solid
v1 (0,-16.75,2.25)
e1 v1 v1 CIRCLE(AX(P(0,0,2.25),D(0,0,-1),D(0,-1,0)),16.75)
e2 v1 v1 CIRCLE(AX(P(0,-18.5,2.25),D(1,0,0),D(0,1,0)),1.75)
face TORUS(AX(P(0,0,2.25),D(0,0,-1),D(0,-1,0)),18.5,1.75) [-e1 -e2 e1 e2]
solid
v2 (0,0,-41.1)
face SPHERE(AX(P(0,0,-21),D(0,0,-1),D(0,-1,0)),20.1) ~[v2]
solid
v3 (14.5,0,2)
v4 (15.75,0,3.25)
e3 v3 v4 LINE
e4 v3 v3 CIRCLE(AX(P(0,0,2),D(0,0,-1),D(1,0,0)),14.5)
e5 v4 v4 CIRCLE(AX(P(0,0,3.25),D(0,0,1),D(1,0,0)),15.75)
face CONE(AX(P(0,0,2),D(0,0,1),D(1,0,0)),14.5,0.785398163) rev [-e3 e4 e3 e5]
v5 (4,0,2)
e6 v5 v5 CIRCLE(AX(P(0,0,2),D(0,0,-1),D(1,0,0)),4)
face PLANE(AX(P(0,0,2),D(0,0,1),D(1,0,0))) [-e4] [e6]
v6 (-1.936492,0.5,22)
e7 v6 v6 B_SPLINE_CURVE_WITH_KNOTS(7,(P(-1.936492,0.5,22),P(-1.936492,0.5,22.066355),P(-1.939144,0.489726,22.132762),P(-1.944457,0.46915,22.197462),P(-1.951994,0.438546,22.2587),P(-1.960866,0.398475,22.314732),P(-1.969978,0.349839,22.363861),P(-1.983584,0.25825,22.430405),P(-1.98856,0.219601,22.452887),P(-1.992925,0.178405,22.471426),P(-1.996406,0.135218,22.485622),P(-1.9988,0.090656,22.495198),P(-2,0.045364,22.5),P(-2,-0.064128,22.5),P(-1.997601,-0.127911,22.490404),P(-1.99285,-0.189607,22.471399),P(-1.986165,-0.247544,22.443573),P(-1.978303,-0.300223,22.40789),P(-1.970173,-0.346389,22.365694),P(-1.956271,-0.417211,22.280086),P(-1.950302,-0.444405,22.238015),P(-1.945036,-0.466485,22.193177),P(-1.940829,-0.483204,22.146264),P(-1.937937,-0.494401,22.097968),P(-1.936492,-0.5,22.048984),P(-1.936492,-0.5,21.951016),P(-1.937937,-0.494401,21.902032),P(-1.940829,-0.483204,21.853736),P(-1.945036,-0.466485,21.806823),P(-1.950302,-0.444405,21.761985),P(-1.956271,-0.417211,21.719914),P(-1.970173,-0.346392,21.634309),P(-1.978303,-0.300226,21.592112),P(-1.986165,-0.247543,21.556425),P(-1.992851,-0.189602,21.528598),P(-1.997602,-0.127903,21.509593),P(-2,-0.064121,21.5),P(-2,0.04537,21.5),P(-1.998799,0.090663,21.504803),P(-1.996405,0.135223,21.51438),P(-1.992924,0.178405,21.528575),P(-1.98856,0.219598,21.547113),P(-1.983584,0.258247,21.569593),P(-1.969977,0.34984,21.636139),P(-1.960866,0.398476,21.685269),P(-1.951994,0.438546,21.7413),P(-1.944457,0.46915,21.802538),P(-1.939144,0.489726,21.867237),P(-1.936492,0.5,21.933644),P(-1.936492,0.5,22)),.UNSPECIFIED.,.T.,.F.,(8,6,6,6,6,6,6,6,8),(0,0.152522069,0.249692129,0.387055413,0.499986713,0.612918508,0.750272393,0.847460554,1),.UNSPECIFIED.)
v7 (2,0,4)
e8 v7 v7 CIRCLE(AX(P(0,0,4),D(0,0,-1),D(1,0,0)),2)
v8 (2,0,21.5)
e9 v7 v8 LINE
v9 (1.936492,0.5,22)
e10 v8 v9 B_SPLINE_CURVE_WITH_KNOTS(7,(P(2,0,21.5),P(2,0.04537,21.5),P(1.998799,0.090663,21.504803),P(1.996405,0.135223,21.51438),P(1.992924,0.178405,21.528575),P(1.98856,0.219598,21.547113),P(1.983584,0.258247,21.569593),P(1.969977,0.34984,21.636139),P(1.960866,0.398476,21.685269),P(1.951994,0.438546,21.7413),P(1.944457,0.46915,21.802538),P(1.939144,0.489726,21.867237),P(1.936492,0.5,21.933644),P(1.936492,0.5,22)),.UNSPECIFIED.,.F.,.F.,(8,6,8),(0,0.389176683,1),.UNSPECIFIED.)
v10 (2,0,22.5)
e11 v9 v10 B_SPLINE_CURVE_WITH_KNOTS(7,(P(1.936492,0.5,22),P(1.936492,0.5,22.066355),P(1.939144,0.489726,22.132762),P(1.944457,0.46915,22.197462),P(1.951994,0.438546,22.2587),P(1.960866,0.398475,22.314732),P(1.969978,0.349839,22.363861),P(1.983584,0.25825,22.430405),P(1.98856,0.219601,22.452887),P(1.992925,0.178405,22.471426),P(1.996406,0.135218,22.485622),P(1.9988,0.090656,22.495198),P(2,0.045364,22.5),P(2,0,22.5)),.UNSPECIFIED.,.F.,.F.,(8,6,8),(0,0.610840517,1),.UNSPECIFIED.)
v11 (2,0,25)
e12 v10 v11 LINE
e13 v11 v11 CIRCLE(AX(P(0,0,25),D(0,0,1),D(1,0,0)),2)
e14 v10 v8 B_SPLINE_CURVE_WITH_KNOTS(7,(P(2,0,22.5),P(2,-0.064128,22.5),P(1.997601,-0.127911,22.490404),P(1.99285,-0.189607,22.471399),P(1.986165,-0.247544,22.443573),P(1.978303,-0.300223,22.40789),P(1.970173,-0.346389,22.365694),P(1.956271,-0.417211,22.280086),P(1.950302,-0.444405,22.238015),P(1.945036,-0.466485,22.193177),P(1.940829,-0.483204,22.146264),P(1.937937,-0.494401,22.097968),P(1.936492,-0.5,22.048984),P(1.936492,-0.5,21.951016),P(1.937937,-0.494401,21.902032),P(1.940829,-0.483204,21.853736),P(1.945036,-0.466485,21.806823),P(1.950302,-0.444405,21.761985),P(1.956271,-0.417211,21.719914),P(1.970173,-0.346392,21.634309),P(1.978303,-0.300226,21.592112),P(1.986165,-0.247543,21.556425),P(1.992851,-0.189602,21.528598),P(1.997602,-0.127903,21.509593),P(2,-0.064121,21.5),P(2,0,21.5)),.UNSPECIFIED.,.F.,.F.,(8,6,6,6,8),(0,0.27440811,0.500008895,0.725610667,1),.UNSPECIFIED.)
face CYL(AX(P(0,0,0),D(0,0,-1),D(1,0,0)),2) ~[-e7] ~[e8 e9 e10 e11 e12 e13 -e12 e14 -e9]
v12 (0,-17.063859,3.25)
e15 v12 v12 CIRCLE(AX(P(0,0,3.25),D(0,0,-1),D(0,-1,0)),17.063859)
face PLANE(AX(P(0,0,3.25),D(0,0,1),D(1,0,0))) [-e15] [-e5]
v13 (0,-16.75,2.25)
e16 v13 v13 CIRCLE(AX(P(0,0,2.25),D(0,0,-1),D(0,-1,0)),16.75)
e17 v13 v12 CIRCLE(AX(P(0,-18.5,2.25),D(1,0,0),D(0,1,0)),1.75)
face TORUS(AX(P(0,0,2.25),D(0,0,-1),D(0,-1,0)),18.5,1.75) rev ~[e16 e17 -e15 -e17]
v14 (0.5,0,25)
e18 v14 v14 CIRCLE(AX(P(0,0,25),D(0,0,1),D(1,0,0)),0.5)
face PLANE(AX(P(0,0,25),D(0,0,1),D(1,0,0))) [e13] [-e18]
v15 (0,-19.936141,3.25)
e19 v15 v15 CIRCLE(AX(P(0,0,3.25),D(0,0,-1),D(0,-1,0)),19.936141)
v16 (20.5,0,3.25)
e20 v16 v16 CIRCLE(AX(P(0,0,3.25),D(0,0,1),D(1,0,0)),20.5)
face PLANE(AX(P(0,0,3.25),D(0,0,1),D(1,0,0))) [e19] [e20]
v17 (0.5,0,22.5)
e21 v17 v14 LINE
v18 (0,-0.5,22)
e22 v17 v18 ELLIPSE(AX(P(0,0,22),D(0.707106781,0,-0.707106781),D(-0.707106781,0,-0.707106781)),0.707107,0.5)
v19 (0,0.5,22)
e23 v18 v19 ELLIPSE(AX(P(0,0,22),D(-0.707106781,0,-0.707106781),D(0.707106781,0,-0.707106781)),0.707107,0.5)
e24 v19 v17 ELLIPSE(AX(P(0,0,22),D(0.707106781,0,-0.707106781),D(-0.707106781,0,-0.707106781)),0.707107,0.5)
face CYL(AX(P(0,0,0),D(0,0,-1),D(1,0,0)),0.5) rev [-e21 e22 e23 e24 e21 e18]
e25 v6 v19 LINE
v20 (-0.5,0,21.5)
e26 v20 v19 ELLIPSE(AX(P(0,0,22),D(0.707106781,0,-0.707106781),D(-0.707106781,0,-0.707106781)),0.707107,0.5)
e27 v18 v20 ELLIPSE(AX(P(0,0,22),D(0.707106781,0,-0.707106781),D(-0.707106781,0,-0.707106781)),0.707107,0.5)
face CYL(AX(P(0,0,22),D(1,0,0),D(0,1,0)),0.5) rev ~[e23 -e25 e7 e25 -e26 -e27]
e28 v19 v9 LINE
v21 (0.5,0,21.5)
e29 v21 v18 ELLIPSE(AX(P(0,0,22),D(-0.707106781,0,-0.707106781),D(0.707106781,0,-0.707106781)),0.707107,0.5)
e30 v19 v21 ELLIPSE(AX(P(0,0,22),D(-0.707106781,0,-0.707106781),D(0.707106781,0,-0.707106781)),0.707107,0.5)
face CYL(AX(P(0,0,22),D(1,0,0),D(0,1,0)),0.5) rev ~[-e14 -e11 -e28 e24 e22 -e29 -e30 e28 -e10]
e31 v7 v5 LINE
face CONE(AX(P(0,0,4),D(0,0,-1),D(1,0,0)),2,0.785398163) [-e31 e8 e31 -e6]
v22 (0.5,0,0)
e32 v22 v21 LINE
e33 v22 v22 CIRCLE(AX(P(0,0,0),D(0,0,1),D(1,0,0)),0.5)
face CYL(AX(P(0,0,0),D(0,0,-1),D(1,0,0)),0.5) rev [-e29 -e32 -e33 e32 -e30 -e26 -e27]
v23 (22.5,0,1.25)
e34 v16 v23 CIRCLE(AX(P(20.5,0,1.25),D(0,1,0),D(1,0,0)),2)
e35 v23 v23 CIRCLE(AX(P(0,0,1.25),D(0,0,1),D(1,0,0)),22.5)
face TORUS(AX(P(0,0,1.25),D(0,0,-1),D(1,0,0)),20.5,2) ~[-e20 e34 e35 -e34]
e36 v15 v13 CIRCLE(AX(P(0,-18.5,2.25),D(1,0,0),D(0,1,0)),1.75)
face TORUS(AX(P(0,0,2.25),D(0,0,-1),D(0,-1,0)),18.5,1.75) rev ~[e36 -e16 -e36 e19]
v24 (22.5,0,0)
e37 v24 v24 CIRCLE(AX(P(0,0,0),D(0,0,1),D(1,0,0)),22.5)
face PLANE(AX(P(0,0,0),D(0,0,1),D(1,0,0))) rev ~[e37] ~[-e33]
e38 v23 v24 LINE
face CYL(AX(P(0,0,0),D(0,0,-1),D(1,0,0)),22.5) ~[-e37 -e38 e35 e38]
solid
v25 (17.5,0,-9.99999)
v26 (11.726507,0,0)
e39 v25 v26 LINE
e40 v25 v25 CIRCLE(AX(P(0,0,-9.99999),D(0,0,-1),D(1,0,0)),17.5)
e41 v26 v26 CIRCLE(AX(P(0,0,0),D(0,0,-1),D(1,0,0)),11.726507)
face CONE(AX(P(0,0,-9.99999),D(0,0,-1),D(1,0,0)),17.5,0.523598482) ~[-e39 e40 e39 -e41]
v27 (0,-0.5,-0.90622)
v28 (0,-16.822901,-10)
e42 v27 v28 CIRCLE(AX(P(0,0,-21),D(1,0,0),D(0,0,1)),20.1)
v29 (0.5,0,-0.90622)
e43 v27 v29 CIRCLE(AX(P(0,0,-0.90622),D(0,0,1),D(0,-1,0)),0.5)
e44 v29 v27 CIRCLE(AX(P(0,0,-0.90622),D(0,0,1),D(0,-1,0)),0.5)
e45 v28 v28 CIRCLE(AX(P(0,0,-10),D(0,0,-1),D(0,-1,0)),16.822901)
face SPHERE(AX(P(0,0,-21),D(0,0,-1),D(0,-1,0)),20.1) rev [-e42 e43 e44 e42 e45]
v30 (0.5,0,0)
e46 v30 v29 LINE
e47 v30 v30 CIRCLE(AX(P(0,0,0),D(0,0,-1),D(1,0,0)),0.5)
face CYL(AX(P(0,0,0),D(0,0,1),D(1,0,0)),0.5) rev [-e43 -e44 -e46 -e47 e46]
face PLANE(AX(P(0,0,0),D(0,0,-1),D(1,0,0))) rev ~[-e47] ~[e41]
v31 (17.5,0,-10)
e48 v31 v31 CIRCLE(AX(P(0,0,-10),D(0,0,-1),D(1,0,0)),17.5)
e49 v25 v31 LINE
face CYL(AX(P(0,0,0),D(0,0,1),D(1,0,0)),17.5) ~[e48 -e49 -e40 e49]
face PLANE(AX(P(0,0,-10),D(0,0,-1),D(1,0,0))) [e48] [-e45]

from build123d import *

# Parameters (mm, degrees)
F0_R      = 22.5
F0_R_2    = 16.5
F0_R_3    = 2
F0_R_4    = 0.5
F1_DEPTH  = 2
F2_DEPTH  = 25
F3_DEPTH  = 3.25
F6_R      = 1.75
F10_R     = 2
F11_R     = 17.5
F11_R_2   = 0.5
F12_DEPTH = 10
F15_SIZE2 = 5.773493
F15_SIZE  = 9.99999
F17_R     = 0.5
F18_DEPTH = 12.5


# Not quite as in the source:
# - a fillet or chamfer that OpenCascade refuses, or shapes differently, is made with other operations: its cross-section is extruded or revolved along the edge and cut away or added
# - a fillet or chamfer is up to 0.001 mm smaller than in the source, because OpenCascade refuses the exact size


with BuildPart() as f1:
    # F0 (on Top) → F1 (new body)
    with BuildSketch(Plane.XY):
        Circle(F0_R)
        Circle(F0_R_2, mode=Mode.SUBTRACT)
        Circle(F0_R_2)
        Circle(F0_R_3, mode=Mode.SUBTRACT)
        Circle(F0_R_3)
        Circle(F0_R_4, mode=Mode.SUBTRACT)
    extrude(amount=F1_DEPTH)

    # F0 (on Top) → F2 (join)
    with BuildSketch(Plane.XY):
        Circle(F0_R_3)
        Circle(F0_R_4, mode=Mode.SUBTRACT)
    extrude(amount=F2_DEPTH)

    # F0 (on Top) → F3 (join)
    with BuildSketch(Plane.XY):
        Circle(F0_R)
        Circle(F0_R_2, mode=Mode.SUBTRACT)
    extrude(amount=F3_DEPTH)


with BuildPart() as f7:
    # F6 (on Right) → F7 (revolve)
    with BuildSketch(Plane.YZ):
        with Locations((-18.5, 2.25)):
            Circle(F6_R)
    revolve(axis=Axis((0, 0, 2.25), (0, 0, -1)))


with BuildPart() as f1_1:
    add(f1.part)

    # F8: cut F7
    add(f7.part, mode=Mode.SUBTRACT)

    # F9: chamfer of 2 on 2 edges, made by hand

    # F9_s1 → F9_t2 (revolve)
    with BuildSketch(Plane.XZ):
        Polygon((2, 4), (4, 2), (2, 2), align=None)
    revolve(axis=Axis((0, 0, 2), (0, 0, -1)))


with BuildPart() as f9_tool4:
    # F9_s5 → F9_t6 (revolve)
    with BuildSketch(Plane.XZ):
        Polygon((14.5, 2), (16.5, 4), (16.5, 2), align=None)
    revolve(axis=Axis((0, 0, 2), (0, 0, -1)))

    split(bisect_by=Plane.XY.offset(3.25), keep=Keep.BOTTOM)


with BuildPart() as f1_2:
    add(f1_1.part)

    # F9_t3: union F9_tool4
    add(f9_tool4.part)

    # F10
    f10_edges = [f1_2.edges().sort_by_distance(p)[0] for p in [
        (-22.5, 0, 3.25),
    ]]
    fillet(f10_edges, radius=F10_R)

    # F17 (on Right) → F18 (cut, symmetric)
    with BuildSketch(Plane.YZ):
        with Locations((0, 22)):
            Circle(F17_R)
    extrude(amount=F18_DEPTH, both=True, mode=Mode.SUBTRACT)


with BuildPart() as f12:
    # F11 (on face) → F12 (new body)
    with BuildSketch(Plane(origin=(0, 0, 0), x_dir=(1, 0, 0), z_dir=(0, 0, -1))):
        Circle(F11_R)
        Circle(F11_R_2, mode=Mode.SUBTRACT)
    extrude(amount=F12_DEPTH)

    # F15 (size 10 and 5.7735026919 in the source; OpenCascade refuses exactly that, so slightly less here)
    f15_edges = [f12.edges().sort_by_distance(p)[0] for p in [
        (-17.5, 0, 0),
    ]]
    f15_side = f12.faces().sort_by_distance((-17.5, 0, -5))[0]
    chamfer(f15_edges, length=F15_SIZE, length2=F15_SIZE2, reference=f15_side)


with BuildPart() as f14:
    # F13 (on Right) → F14 (revolve)
    with BuildSketch(Plane.YZ):
        with BuildLine():
            ThreePointArc((0, -0.9), (-20.1, -21), (0, -41.1))
            Line((0, -41.1), (0, -21))
            Line((0, -21), (0, -0.9))
        make_face()
    revolve(axis=Axis((0, 0, -10.5), (0, 0, 1)))


with BuildPart() as f12_1:
    add(f12.part)

    # F16: cut F14
    add(f14.part, mode=Mode.SUBTRACT)


solid = Compound([f7.part, f1_2.part, f14.part, f12_1.part])
